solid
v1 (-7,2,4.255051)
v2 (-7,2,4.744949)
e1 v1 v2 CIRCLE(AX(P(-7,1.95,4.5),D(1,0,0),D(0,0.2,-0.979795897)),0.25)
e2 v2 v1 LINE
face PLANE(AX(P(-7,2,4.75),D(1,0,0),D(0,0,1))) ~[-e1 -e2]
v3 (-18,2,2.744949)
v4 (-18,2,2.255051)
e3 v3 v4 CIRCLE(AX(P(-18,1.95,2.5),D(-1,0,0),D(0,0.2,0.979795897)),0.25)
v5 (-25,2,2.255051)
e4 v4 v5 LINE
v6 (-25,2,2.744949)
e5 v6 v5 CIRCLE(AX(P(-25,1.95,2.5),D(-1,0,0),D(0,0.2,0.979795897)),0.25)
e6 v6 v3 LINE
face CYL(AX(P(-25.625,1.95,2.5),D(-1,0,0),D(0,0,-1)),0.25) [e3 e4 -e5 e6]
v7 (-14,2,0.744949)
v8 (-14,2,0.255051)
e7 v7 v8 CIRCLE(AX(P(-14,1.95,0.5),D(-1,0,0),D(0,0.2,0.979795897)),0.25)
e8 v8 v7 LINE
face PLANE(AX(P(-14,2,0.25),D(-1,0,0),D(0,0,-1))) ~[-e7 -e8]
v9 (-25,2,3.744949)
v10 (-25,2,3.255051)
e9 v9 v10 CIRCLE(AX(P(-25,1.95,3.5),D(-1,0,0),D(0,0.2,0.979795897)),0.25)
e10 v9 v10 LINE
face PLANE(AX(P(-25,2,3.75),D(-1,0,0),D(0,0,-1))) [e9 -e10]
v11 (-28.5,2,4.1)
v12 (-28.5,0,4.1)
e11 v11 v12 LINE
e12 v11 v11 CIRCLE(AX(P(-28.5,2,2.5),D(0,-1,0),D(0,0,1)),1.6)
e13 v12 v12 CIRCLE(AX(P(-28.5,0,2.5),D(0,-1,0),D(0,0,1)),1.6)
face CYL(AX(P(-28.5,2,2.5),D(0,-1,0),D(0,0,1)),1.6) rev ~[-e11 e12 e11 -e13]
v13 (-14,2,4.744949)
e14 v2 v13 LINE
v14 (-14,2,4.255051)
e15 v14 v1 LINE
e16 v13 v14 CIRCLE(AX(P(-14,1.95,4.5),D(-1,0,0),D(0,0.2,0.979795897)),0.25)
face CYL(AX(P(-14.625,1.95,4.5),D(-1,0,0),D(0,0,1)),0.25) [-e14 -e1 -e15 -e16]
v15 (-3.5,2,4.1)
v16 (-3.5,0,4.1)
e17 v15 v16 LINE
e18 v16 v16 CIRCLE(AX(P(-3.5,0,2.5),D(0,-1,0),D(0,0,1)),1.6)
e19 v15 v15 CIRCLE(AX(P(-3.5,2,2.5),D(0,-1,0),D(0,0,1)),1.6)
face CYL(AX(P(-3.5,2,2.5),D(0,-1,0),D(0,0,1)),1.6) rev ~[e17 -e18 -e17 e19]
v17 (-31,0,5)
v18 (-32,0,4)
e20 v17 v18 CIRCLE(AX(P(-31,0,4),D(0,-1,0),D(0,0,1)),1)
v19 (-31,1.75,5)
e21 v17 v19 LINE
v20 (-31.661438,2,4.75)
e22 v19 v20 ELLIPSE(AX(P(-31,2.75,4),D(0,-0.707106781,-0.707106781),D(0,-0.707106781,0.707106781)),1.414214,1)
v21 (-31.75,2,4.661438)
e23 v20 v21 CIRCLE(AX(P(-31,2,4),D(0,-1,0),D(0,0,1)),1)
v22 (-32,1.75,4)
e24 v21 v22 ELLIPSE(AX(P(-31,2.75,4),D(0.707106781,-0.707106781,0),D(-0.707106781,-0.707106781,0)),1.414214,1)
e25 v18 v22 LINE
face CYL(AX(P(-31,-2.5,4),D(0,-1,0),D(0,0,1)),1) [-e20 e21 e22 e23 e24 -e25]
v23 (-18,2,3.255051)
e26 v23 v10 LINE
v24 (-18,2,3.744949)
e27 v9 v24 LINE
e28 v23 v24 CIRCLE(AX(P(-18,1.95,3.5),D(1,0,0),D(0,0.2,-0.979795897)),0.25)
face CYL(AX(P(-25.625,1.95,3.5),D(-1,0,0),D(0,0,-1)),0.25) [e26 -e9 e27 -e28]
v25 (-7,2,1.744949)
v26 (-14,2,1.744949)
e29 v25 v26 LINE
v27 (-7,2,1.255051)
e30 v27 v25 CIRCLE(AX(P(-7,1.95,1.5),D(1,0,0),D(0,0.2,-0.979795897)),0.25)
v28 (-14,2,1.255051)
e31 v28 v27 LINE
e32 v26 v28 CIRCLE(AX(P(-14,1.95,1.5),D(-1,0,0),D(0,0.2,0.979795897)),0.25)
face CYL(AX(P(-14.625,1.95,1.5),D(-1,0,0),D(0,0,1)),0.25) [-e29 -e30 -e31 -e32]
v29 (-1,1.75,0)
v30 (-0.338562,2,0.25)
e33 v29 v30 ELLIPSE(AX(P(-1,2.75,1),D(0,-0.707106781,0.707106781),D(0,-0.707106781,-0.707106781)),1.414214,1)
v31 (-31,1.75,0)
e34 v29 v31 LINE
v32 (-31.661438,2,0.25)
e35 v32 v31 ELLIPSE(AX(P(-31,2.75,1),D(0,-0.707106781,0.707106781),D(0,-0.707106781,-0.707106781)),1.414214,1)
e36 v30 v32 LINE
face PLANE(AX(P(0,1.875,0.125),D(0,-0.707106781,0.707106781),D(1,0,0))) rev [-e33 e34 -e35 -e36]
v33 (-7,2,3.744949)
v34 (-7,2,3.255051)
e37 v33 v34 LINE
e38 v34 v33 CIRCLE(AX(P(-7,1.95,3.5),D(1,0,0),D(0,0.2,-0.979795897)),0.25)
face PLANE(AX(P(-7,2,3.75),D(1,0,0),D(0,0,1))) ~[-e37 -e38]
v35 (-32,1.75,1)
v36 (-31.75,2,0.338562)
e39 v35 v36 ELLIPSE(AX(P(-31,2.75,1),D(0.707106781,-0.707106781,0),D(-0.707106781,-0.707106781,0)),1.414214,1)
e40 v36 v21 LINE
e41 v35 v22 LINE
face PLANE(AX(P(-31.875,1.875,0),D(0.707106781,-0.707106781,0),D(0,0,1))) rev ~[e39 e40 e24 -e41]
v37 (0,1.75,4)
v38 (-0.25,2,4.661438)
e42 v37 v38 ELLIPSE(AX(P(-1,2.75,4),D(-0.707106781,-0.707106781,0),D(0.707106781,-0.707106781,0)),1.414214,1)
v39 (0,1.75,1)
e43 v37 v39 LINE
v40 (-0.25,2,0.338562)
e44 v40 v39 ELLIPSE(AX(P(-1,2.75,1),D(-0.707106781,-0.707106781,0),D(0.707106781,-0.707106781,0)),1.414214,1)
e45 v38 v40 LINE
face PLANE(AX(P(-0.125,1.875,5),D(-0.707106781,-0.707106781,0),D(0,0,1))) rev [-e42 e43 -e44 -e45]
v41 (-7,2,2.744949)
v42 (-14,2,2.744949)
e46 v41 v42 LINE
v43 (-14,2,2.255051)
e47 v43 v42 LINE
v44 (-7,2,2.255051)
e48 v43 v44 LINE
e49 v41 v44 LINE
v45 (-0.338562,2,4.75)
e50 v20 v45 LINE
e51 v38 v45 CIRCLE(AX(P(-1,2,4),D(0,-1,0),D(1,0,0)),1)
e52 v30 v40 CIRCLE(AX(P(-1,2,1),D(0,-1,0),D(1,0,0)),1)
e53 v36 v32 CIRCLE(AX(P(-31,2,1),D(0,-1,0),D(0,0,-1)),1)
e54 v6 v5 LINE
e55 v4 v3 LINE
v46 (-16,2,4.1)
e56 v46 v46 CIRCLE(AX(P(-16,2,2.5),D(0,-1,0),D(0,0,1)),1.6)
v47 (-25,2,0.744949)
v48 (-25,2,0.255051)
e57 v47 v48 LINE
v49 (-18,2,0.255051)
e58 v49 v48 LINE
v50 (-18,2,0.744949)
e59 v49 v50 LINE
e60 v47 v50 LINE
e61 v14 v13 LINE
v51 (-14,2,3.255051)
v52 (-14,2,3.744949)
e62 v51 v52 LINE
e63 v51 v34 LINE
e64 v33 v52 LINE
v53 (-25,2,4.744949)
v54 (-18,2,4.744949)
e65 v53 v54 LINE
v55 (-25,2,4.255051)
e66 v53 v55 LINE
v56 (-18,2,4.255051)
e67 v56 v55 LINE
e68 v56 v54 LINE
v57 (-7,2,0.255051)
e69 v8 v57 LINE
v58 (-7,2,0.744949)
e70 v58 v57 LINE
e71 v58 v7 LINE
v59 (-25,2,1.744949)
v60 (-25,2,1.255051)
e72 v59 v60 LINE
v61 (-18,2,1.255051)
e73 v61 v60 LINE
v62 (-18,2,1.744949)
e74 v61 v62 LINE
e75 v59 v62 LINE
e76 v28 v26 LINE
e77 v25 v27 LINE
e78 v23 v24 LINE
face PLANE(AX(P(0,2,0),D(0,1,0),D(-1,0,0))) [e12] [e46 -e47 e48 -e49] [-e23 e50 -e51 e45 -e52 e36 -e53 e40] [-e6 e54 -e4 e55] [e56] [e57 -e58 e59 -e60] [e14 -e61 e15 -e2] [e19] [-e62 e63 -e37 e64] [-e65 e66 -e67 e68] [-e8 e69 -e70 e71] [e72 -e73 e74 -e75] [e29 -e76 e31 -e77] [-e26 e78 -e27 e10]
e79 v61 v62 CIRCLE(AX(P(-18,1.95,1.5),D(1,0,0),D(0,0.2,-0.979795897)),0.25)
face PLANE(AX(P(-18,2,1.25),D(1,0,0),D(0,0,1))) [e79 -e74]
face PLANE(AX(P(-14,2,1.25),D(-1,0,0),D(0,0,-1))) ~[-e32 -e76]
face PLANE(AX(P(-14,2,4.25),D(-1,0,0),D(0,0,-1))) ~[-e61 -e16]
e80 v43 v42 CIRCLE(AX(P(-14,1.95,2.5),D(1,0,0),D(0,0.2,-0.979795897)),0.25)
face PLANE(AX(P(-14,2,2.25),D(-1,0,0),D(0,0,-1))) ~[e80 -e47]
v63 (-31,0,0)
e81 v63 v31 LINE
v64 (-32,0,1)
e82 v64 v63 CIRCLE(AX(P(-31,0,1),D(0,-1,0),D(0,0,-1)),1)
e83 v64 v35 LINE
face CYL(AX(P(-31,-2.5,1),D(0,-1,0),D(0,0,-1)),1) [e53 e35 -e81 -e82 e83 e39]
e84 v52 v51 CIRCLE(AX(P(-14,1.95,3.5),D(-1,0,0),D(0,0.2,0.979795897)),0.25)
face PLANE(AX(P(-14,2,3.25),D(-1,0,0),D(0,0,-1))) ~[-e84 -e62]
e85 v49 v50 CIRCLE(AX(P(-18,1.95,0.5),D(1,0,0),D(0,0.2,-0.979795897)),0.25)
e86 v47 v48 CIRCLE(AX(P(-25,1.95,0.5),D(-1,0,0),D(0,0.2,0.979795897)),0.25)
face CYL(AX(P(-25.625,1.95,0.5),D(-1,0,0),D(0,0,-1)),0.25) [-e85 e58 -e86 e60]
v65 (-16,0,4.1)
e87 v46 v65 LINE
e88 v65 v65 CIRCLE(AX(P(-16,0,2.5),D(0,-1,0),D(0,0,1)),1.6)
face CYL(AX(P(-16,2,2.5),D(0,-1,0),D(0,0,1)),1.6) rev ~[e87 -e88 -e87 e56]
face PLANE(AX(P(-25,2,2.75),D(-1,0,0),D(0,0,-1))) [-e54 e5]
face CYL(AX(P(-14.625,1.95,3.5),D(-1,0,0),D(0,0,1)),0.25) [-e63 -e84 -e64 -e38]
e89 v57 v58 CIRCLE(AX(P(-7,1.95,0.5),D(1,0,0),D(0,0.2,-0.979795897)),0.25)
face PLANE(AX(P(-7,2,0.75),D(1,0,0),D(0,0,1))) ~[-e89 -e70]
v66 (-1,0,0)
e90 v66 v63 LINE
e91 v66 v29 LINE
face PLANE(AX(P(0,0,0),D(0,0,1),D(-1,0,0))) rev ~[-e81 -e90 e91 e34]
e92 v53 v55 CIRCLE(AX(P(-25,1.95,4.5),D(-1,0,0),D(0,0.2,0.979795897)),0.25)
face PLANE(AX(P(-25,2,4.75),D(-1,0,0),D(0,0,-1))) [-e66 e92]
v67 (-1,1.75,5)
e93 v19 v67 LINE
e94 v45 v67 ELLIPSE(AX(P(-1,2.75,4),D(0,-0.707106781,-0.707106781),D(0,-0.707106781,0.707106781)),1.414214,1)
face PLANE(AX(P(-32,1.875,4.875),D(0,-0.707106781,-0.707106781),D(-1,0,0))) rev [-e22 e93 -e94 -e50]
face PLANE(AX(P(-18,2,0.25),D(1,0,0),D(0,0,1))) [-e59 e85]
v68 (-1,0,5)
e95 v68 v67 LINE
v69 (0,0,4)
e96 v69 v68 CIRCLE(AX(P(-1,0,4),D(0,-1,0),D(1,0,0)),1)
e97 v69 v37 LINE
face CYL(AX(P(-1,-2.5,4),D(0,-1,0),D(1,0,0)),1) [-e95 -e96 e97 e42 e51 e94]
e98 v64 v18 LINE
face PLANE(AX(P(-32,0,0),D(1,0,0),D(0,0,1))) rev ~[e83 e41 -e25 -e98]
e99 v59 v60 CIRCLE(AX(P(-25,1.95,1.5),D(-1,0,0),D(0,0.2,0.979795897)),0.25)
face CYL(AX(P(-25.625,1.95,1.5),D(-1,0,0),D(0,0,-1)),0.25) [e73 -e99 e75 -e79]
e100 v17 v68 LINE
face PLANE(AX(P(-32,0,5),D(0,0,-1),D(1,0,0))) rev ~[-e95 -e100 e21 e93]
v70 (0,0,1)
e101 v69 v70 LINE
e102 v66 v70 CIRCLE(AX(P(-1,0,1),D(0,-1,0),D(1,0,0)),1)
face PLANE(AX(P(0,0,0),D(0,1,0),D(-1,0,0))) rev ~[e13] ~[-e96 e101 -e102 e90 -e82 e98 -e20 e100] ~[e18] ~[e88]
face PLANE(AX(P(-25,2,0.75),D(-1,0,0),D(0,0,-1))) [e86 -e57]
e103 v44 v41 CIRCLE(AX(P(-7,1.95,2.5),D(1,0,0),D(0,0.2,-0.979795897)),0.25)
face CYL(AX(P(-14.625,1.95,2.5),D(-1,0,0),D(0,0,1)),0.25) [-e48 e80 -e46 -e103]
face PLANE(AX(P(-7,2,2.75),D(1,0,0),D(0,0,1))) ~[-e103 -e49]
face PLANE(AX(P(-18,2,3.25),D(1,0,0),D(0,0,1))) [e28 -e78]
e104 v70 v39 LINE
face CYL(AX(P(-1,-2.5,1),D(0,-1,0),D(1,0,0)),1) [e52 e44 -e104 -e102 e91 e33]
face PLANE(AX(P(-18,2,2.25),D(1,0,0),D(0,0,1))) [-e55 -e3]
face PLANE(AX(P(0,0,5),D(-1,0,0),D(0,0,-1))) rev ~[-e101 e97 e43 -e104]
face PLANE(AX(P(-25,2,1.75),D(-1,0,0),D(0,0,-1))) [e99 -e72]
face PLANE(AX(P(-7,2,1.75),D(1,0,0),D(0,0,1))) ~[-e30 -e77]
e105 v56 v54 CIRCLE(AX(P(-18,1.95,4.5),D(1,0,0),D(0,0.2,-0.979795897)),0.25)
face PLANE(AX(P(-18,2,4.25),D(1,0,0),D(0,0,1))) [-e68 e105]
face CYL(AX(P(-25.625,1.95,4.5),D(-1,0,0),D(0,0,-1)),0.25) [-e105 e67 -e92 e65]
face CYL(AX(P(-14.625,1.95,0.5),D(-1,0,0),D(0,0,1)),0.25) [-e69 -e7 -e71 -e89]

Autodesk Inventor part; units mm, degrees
ref_plane "YZ Plane" through (0, 0, 0) normal (1, 0, 0) x (0, 1, 0)
ref_plane "XZ Plane" through (0, 0, 0) normal (0, 1, 0) x (-1, 0, 0)
ref_plane "XY Plane" through (0, 0, 0) normal (0, 0, 1) x (1, 0, 0)
sketch "Skizze1" plane through (0, 0, 0) normal (0, 1, 0) x (-1, 0, 0)
  line L0 (0, 0) -> (32, 0)
  line L1 (32, 0) -> (32, 5)
  line L2 (32, 5) -> (0, 5)
  line L3 (0, 5) -> (0, 0)
  dimension "d0" = 32
  dimension "d1" = 5
extrude "Extrusion1" add sketch "Skizze1" along normal blind 2
ref_plane "Arbeitsebene1" through (-32, 0, 2.5) normal (0, 0, 1) x (1, 0, 0)
ref_plane "Arbeitsebene2" through (-16, 0, 5) normal (1, 0, 0) x (0, 0, -1)
sketch "Skizze2" plane through (0, 2, 0) normal (0, 1, 0) x (1, 0, 0)
  line L0 (6.4, -2.5) -> (-38.4, -2.5) projected
  line L1 (-16, 1) -> (-16, -6) projected
  point P0 (0, 0)
  point P1 (-28.5, -2.5)
  point P2 (-16, -2.5)
  point P3 (-3.5, -2.5)
  dimension "d4" = 25
  dimension "d5" = 12.5
hole "Bohrung1" at (-28.5, 2, 2.5) at (-16, 2, 2.5) at (-3.5, 2, 2.5) direction (0, -1, 0) diameter 3.2 end through all
sketch "Skizze3" plane through (0, 2, 0) normal (0, 1, 0) x (1, 0, 0)
  line L0 (-18, -4.75) -> (-25, -4.75)
  line L1 (-25, -4.75) -> (-25, -4.25)
  line L2 (-25, -4.25) -> (-18, -4.25)
  line L3 (-18, -4.25) -> (-18, -4.75)
  line L4 (-18, -3.75) -> (-25, -3.75)
  line L5 (-25, -3.75) -> (-25, -3.25)
  line L6 (-25, -3.25) -> (-18, -3.25)
  line L7 (-18, -3.25) -> (-18, -3.75)
  line L8 (-18, -2.75) -> (-25, -2.75)
  line L9 (-25, -2.75) -> (-25, -2.25)
  line L10 (-25, -2.25) -> (-18, -2.25)
  line L11 (-18, -2.25) -> (-18, -2.75)
  line L12 (-18, -1.75) -> (-25, -1.75)
  line L13 (-25, -1.75) -> (-25, -1.25)
  line L14 (-25, -1.25) -> (-18, -1.25)
  line L15 (-18, -1.25) -> (-18, -1.75)
  line L16 (-18, -0.75) -> (-25, -0.75)
  line L17 (-25, -0.75) -> (-25, -0.25)
  line L18 (-25, -0.25) -> (-18, -0.25)
  line L19 (-18, -0.25) -> (-18, -0.75)
  line L20 (-16, 1) -> (-16, -6) projected
  line L21 (-32, -5) -> (0, -5) projected
  line L22 (0, 0) -> (-32, 0) projected
  dimension "d13" = 2
  dimension "d14" = 7
  dimension "d15" = 0.5
  dimension "d16" = 0.5
  dimension "d17" = 0.5
  dimension "d18" = 0.5
  dimension "d19" = 0.5
  dimension "d20" = 0.25
  dimension "d21" = 0.25
extrude "Extrusion2" add sketch "Skizze3" along normal blind 0.2
fillet "Rundung1" radius 0.25 10 edges at (-21.5, 2.2, 4.25) (-21.5, 2.2, 4.75) (-21.5, 2.2, 3.75) (-21.5, 2.2, 3.25) (-21.5, 2.2, 2.75) (-21.5, 2.2, 2.25) (-21.5, 2.2, 1.75) (-21.5, 2.2, 1.25) (-21.5, 2.2, 0.75) (-21.5, 2.2, 0.25)
mirror "Spiegeln1" about plane through (-16, 0, 5) normal (1, 0, 0) of "Rundung1", "Extrusion2"
chamfer "Fase1" distance 0.25 angle 45 4 edges at (-16, 2, 5) (-16, 2, 0) (0, 2, 2.5) (-32, 2, 2.5)
fillet "Rundung2" radius 1 4 edges at (-32, 0.875, 5) (-32, 0.875, 0) (0, 0.875, 5) (0, 0.875, 0)
equation "\"d5\" = 0.5 * d4"
equation "\"d16\" = d15"
equation "\"d17\" = d16"
equation "\"d18\" = d17"
equation "\"d19\" = d17"
properties part number "x_carriage_aio_clamp"
